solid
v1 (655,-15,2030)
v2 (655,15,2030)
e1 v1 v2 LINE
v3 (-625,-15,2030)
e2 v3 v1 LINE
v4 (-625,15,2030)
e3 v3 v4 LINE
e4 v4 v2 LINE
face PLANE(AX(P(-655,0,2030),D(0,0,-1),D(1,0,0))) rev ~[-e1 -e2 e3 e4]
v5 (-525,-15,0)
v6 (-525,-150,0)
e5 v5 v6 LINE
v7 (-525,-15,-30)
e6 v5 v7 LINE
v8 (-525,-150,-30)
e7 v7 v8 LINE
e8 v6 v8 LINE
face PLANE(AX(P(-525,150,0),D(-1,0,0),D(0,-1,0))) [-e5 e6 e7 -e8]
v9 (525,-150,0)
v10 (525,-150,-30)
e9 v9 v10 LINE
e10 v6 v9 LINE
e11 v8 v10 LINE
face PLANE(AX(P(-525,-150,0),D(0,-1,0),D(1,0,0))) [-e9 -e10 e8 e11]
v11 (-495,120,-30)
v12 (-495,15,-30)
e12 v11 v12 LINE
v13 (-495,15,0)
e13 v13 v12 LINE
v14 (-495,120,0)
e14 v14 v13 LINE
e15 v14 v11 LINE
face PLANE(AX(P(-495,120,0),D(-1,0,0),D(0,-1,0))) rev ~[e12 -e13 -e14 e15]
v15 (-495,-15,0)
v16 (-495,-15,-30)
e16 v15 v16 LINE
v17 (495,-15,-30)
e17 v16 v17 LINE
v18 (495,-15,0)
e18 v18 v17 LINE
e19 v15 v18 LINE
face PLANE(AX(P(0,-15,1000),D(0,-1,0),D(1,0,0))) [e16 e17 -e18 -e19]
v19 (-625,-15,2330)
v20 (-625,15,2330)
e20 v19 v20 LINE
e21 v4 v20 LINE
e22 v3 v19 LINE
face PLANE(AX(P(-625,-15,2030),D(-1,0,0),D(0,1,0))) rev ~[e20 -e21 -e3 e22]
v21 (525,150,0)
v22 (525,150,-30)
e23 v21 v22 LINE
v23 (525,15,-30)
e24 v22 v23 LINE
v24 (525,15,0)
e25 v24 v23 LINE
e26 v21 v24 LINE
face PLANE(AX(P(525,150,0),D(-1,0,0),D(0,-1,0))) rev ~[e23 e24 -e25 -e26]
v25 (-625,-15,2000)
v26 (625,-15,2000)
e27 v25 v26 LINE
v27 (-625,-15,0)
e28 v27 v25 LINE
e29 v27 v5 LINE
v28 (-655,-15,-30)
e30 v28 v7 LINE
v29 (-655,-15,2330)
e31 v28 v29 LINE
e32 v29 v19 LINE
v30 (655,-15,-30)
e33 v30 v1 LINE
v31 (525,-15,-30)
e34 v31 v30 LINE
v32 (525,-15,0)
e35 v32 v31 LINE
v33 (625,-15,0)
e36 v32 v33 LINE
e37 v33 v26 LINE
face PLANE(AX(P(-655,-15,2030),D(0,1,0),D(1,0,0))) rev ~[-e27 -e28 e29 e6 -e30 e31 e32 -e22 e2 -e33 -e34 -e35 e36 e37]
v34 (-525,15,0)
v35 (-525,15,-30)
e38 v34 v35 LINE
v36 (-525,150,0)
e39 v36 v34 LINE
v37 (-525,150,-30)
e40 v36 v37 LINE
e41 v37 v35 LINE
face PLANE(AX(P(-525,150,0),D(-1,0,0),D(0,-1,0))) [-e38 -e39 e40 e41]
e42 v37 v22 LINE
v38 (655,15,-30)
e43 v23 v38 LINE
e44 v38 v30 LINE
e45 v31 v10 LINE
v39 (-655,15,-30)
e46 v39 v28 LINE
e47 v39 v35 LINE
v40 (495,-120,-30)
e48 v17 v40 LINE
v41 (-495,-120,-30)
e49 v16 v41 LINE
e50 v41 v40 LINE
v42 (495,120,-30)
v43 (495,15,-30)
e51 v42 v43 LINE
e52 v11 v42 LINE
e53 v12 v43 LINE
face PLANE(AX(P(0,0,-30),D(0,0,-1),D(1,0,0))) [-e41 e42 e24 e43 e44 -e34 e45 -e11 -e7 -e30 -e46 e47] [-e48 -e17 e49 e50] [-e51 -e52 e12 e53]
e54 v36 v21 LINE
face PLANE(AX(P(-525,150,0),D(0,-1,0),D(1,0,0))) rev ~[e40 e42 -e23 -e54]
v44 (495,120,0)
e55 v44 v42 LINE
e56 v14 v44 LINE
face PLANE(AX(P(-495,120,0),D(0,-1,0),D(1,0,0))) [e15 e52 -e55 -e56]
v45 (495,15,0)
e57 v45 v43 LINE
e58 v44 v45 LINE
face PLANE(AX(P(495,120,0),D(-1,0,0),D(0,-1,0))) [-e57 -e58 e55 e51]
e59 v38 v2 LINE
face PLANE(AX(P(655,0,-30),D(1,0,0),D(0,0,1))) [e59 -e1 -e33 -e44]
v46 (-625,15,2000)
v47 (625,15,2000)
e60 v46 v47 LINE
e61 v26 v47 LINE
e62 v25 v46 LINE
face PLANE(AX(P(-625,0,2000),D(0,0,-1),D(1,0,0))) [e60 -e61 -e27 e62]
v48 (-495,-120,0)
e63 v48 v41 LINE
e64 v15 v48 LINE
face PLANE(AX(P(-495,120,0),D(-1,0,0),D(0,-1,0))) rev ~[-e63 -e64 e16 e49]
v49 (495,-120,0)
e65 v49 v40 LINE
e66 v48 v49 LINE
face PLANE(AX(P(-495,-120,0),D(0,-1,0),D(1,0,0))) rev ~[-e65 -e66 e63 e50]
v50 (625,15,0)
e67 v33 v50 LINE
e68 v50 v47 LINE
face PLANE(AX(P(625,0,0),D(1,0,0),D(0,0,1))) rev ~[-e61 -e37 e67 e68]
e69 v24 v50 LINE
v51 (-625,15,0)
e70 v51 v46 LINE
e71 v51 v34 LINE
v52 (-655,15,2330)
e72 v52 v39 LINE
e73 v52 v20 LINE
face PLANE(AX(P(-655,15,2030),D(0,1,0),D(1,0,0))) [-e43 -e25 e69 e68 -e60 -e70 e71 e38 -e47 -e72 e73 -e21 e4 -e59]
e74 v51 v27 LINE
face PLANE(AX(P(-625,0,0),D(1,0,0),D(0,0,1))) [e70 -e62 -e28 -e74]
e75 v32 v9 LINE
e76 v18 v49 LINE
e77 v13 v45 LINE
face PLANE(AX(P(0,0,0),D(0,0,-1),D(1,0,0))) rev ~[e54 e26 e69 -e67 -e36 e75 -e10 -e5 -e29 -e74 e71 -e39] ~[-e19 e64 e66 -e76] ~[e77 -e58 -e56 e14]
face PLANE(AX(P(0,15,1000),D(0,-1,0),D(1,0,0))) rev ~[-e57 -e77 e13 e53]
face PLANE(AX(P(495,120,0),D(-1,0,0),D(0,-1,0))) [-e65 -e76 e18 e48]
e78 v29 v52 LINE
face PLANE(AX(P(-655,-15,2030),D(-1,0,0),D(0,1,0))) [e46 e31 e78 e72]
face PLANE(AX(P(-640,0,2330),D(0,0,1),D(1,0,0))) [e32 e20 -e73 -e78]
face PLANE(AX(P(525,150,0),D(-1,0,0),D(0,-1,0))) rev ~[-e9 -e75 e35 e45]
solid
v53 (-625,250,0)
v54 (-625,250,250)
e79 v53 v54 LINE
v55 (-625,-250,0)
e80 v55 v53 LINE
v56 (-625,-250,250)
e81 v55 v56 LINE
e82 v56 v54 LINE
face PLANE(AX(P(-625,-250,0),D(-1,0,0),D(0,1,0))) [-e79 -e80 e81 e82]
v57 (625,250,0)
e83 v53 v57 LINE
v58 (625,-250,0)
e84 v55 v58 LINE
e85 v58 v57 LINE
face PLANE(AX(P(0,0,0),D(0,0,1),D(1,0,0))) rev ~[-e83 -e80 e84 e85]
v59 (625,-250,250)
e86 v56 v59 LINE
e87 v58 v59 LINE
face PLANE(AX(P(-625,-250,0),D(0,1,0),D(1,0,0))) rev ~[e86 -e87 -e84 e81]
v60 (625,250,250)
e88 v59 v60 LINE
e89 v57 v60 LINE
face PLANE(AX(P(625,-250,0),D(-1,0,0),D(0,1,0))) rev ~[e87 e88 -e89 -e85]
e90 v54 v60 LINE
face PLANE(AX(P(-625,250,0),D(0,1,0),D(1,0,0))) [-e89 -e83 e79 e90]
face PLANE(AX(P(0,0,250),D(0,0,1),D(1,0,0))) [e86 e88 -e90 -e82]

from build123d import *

# Parameters (mm, degrees)
F0_W     = 1250
F0_H     = 500
F1_DEPTH = 250
F2_W     = 1310
F2_H     = 2060
F2_W_2   = 1250
F2_H_2   = 2000
F3_DEPTH = 15
F4_W     = 1050
F4_H     = 300
F4_W_2   = 990
F4_H_2   = 240
F5_DEPTH = 30
F6_W     = 30
F6_H     = 30
F7_DEPTH = 300


with BuildPart() as f1:
    # F0 (on Top) → F1 (new body)
    with BuildSketch(Plane.XY):
        Rectangle(F0_W, F0_H)
    extrude(amount=F1_DEPTH)


with BuildPart() as f3:
    # F2 (on Front) → F3 (new body, symmetric)
    with BuildSketch(Plane.XZ):
        with Locations((0, 1000)):
            Rectangle(F2_W, F2_H)
        with Locations((0, 1000)):
            Rectangle(F2_W_2, F2_H_2, mode=Mode.SUBTRACT)
    extrude(amount=F3_DEPTH, both=True)

    # F4 (on face) → F5 (join)
    with BuildSketch(Plane(origin=(0, 0, 0), x_dir=(1, 0, 0), z_dir=(0, 0, -1))):
        Rectangle(F4_W, F4_H)
        Rectangle(F4_W_2, F4_H_2, mode=Mode.SUBTRACT)
    extrude(amount=F5_DEPTH)

    # F6 (on face) → F7 (join)
    with BuildSketch(Plane.XY.offset(2030)):
        with Locations((-640, 0)):
            Rectangle(F6_W, F6_H)
    extrude(amount=F7_DEPTH)


solid = Compound([f1.part, f3.part])
